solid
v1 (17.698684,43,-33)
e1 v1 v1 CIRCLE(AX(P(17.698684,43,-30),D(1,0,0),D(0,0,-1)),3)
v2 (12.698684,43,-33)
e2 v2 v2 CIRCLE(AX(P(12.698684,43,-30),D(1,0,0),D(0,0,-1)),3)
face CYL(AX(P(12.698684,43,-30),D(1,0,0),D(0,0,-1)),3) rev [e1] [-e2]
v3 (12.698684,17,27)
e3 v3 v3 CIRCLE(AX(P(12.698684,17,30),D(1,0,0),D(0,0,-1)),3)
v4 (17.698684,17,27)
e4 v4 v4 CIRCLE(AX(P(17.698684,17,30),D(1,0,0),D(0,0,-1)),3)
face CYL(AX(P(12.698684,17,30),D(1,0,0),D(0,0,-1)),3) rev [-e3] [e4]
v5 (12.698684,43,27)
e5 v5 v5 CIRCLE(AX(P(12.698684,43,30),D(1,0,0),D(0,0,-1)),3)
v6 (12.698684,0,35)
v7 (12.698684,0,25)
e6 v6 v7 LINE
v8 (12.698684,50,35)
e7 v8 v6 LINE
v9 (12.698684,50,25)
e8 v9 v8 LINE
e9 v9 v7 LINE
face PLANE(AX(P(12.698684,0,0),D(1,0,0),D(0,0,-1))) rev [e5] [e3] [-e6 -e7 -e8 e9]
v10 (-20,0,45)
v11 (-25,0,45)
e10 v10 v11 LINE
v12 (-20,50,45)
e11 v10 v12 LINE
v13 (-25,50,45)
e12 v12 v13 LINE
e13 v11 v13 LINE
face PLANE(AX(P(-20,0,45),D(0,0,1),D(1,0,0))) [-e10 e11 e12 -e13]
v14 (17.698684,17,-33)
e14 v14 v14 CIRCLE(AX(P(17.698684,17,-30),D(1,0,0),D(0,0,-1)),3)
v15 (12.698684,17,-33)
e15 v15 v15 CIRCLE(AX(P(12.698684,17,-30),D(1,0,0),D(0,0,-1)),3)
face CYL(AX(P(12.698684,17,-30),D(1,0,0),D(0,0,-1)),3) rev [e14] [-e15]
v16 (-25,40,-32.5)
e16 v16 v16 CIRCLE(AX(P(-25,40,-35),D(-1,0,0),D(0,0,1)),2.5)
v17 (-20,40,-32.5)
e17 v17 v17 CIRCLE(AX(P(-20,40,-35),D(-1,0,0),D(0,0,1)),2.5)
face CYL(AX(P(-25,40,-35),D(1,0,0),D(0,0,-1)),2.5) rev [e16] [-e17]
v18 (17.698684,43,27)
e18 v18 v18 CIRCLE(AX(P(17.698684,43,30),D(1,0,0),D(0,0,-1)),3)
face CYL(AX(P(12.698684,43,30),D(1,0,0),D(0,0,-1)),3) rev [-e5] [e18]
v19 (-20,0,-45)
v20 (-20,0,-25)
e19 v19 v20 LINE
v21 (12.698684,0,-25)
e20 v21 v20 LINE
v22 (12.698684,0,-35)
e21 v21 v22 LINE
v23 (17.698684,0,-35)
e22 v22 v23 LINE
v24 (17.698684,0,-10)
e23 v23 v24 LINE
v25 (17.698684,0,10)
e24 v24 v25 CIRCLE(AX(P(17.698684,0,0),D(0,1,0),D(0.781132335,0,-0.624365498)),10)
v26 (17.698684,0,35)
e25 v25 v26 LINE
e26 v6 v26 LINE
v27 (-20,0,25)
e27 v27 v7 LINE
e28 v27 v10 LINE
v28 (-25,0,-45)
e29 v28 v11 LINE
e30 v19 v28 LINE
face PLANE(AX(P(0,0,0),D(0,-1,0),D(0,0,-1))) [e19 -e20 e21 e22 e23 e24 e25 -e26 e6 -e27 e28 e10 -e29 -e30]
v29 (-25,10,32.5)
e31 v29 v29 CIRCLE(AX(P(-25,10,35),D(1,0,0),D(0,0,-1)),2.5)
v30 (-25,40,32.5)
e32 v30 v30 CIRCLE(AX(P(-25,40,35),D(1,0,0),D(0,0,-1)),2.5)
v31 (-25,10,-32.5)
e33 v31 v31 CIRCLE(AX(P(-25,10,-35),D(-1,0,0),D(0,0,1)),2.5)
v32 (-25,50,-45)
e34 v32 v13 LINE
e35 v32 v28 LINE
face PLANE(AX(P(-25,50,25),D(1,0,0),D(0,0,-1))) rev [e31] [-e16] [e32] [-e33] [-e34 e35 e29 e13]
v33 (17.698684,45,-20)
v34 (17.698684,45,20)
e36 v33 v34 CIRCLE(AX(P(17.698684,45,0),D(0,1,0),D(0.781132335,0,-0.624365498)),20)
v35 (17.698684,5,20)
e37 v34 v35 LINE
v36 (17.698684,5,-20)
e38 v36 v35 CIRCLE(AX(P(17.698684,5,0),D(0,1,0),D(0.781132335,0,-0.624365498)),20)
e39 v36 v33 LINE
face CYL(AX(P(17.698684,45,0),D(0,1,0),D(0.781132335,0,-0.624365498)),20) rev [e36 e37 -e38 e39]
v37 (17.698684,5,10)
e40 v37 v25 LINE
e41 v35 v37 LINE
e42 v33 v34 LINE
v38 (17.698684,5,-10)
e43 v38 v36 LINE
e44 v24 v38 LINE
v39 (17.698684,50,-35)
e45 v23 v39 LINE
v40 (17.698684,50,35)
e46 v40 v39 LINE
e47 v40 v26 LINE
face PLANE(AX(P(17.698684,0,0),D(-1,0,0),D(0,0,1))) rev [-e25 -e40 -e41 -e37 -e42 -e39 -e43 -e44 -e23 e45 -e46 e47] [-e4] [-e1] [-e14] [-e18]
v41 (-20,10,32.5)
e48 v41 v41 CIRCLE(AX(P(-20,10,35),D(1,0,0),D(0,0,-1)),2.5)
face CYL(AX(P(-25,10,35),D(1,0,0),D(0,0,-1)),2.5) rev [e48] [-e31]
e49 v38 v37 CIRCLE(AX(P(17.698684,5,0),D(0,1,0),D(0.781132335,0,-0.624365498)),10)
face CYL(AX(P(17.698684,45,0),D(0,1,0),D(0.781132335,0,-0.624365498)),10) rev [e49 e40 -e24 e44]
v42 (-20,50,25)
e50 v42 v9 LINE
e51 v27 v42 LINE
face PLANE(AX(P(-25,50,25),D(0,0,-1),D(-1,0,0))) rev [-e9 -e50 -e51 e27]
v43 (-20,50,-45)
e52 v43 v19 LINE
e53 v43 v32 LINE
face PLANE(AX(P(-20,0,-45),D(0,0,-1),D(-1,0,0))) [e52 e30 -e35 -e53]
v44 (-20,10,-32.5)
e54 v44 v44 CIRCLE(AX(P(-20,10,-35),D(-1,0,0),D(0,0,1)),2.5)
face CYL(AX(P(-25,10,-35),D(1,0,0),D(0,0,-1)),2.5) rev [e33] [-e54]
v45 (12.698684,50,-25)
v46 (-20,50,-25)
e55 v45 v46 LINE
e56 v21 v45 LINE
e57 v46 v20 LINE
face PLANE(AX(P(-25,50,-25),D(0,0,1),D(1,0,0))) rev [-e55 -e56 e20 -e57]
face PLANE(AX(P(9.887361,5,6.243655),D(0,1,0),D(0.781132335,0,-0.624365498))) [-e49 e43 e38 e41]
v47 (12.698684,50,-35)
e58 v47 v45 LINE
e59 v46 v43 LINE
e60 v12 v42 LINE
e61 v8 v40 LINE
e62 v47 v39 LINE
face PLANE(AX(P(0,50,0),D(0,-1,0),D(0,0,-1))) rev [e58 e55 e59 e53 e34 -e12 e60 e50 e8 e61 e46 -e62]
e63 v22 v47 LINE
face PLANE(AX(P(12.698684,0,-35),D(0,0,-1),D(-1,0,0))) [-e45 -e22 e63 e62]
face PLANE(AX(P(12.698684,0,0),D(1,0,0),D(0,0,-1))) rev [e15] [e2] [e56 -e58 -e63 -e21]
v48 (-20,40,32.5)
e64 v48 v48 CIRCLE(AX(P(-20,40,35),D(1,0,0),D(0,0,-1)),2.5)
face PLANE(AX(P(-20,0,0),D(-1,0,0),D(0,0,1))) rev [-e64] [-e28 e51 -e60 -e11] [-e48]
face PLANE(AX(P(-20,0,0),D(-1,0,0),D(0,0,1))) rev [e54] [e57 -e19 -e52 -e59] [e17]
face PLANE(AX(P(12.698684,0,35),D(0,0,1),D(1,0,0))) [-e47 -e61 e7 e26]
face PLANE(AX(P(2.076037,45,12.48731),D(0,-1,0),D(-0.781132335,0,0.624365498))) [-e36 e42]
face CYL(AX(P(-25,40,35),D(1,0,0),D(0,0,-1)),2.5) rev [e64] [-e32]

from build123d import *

# Parameters (mm, degrees)
SKETCH1_W           = 50
SKETCH1_H           = 50
BOSS_EXTRUDE1_DEPTH = 50
CAVITY1_START       = 5
CAVITY1_DEPTH       = 40
CAVITY1_2_DEPTH     = 5
CUT_EXTRUDE3_REACH  = 72.343
SKETCH6_W           = 50
SKETCH6_H           = 50
SKETCH4_W           = 20
SKETCH4_H           = 50
BOSS_EXTRUDE2_DEPTH = 5
SKETCH5_R           = 2.5
CUT_EXTRUDE2_DEPTH  = 5
SKETCH7_W           = 10
SKETCH7_H           = 50
SKETCH7_R           = 3
BOSS_EXTRUDE3_DEPTH = 5


# Read off the part's stored shape, not the designer's step: Cavity1
with BuildPart() as part:
    # Sketch1 → Boss-Extrude1 (new body)
    with BuildSketch(Plane(origin=(0, 0, 0), x_dir=(1, 0, 0), z_dir=(0, 1, 0))):
        Rectangle(SKETCH1_W, SKETCH1_H)
    extrude(amount=BOSS_EXTRUDE1_DEPTH)

    # Cavity1 outline → Cavity1 (cut)
    with BuildSketch(Plane(origin=(0, 0, 0), x_dir=(1, 0, 0), z_dir=(0, 1, 0)).offset(CAVITY1_START)):
        with BuildLine():
            ThreePointArc((25, 18.619634446), (-2.301315846, 0), (25, -18.619634446))
            Line((25, -18.619634446), (25, 18.619634446))
        make_face()
    extrude(amount=CAVITY1_DEPTH, mode=Mode.SUBTRACT)

    # Cavity1 2 outline → Cavity1 2 (cut)
    with BuildSketch(Plane(origin=(0, 0, 0), x_dir=(1, 0, 0), z_dir=(0, 1, 0))):
        with BuildLine():
            Line((25, -6.833065704), (25, 6.833065704))
            ThreePointArc((25, 6.833065704), (7.698684154, 0), (25, -6.833065704))
        make_face()
    extrude(amount=CAVITY1_2_DEPTH, mode=Mode.SUBTRACT)

    # Sketch6 → Cut-Extrude3 (cut, up to next)
    with BuildSketch(Plane.ZY.offset(-17.698684154), mode=Mode.PRIVATE) as cut_extrude3_sk1:
        with Locations((0, 25)):
            Rectangle(SKETCH6_W, SKETCH6_H)
    cut_extrude3_tool1 = extrude(cut_extrude3_sk1.sketch, amount=-CUT_EXTRUDE3_REACH, mode=Mode.PRIVATE) & part.part
    add(cut_extrude3_tool1.solids().sort_by_distance((17.698684, 25, 0))[0], mode=Mode.SUBTRACT)

    # Sketch4 → Boss-Extrude2 (add)
    with BuildSketch(Plane.ZY.offset(25)):
        with Locations((-35, 25)):
            Rectangle(SKETCH4_W, SKETCH4_H)
        with Locations((35, 25)):
            Rectangle(SKETCH4_W, SKETCH4_H)
    extrude(amount=-BOSS_EXTRUDE2_DEPTH)

    # Sketch5 → Cut-Extrude2 (cut)
    with BuildSketch(Plane(origin=(-20, 0, 0), x_dir=(0, 0, -1), z_dir=(1, 0, 0))):
        with Locations((-35, 40)):
            Circle(SKETCH5_R)
        with Locations((-35, 10)):
            Circle(SKETCH5_R)
    cut_extrude2 = extrude(amount=-CUT_EXTRUDE2_DEPTH, mode=Mode.SUBTRACT)

    # Mirror1: Cut-Extrude2 across plane
    add(cut_extrude2.mirror(Plane.XY), mode=Mode.SUBTRACT)

    # Sketch7 → Boss-Extrude3 (add)
    # profile 1 of 2: a face of its own
    with BuildSketch(Plane(origin=(17.698684154, 0, 0), x_dir=(0, 0, -1), z_dir=(1, 0, 0))):
        with Locations((-30, 25)):
            Rectangle(SKETCH7_W, SKETCH7_H)
        with Locations((-30, 17)):
            Circle(SKETCH7_R, mode=Mode.SUBTRACT)
        with Locations((-30, 43)):
            Circle(SKETCH7_R, mode=Mode.SUBTRACT)
    # profile 2 of 2: a face of its own
    with BuildSketch(Plane(origin=(17.698684154, 0, 0), x_dir=(0, 0, -1), z_dir=(1, 0, 0))):
        with Locations((30, 25)):
            Rectangle(SKETCH7_W, SKETCH7_H)
        with Locations((30, 43)):
            Circle(SKETCH7_R, mode=Mode.SUBTRACT)
        with Locations((30, 17)):
            Circle(SKETCH7_R, mode=Mode.SUBTRACT)
    extrude(amount=-BOSS_EXTRUDE3_DEPTH)


solid = part.part
